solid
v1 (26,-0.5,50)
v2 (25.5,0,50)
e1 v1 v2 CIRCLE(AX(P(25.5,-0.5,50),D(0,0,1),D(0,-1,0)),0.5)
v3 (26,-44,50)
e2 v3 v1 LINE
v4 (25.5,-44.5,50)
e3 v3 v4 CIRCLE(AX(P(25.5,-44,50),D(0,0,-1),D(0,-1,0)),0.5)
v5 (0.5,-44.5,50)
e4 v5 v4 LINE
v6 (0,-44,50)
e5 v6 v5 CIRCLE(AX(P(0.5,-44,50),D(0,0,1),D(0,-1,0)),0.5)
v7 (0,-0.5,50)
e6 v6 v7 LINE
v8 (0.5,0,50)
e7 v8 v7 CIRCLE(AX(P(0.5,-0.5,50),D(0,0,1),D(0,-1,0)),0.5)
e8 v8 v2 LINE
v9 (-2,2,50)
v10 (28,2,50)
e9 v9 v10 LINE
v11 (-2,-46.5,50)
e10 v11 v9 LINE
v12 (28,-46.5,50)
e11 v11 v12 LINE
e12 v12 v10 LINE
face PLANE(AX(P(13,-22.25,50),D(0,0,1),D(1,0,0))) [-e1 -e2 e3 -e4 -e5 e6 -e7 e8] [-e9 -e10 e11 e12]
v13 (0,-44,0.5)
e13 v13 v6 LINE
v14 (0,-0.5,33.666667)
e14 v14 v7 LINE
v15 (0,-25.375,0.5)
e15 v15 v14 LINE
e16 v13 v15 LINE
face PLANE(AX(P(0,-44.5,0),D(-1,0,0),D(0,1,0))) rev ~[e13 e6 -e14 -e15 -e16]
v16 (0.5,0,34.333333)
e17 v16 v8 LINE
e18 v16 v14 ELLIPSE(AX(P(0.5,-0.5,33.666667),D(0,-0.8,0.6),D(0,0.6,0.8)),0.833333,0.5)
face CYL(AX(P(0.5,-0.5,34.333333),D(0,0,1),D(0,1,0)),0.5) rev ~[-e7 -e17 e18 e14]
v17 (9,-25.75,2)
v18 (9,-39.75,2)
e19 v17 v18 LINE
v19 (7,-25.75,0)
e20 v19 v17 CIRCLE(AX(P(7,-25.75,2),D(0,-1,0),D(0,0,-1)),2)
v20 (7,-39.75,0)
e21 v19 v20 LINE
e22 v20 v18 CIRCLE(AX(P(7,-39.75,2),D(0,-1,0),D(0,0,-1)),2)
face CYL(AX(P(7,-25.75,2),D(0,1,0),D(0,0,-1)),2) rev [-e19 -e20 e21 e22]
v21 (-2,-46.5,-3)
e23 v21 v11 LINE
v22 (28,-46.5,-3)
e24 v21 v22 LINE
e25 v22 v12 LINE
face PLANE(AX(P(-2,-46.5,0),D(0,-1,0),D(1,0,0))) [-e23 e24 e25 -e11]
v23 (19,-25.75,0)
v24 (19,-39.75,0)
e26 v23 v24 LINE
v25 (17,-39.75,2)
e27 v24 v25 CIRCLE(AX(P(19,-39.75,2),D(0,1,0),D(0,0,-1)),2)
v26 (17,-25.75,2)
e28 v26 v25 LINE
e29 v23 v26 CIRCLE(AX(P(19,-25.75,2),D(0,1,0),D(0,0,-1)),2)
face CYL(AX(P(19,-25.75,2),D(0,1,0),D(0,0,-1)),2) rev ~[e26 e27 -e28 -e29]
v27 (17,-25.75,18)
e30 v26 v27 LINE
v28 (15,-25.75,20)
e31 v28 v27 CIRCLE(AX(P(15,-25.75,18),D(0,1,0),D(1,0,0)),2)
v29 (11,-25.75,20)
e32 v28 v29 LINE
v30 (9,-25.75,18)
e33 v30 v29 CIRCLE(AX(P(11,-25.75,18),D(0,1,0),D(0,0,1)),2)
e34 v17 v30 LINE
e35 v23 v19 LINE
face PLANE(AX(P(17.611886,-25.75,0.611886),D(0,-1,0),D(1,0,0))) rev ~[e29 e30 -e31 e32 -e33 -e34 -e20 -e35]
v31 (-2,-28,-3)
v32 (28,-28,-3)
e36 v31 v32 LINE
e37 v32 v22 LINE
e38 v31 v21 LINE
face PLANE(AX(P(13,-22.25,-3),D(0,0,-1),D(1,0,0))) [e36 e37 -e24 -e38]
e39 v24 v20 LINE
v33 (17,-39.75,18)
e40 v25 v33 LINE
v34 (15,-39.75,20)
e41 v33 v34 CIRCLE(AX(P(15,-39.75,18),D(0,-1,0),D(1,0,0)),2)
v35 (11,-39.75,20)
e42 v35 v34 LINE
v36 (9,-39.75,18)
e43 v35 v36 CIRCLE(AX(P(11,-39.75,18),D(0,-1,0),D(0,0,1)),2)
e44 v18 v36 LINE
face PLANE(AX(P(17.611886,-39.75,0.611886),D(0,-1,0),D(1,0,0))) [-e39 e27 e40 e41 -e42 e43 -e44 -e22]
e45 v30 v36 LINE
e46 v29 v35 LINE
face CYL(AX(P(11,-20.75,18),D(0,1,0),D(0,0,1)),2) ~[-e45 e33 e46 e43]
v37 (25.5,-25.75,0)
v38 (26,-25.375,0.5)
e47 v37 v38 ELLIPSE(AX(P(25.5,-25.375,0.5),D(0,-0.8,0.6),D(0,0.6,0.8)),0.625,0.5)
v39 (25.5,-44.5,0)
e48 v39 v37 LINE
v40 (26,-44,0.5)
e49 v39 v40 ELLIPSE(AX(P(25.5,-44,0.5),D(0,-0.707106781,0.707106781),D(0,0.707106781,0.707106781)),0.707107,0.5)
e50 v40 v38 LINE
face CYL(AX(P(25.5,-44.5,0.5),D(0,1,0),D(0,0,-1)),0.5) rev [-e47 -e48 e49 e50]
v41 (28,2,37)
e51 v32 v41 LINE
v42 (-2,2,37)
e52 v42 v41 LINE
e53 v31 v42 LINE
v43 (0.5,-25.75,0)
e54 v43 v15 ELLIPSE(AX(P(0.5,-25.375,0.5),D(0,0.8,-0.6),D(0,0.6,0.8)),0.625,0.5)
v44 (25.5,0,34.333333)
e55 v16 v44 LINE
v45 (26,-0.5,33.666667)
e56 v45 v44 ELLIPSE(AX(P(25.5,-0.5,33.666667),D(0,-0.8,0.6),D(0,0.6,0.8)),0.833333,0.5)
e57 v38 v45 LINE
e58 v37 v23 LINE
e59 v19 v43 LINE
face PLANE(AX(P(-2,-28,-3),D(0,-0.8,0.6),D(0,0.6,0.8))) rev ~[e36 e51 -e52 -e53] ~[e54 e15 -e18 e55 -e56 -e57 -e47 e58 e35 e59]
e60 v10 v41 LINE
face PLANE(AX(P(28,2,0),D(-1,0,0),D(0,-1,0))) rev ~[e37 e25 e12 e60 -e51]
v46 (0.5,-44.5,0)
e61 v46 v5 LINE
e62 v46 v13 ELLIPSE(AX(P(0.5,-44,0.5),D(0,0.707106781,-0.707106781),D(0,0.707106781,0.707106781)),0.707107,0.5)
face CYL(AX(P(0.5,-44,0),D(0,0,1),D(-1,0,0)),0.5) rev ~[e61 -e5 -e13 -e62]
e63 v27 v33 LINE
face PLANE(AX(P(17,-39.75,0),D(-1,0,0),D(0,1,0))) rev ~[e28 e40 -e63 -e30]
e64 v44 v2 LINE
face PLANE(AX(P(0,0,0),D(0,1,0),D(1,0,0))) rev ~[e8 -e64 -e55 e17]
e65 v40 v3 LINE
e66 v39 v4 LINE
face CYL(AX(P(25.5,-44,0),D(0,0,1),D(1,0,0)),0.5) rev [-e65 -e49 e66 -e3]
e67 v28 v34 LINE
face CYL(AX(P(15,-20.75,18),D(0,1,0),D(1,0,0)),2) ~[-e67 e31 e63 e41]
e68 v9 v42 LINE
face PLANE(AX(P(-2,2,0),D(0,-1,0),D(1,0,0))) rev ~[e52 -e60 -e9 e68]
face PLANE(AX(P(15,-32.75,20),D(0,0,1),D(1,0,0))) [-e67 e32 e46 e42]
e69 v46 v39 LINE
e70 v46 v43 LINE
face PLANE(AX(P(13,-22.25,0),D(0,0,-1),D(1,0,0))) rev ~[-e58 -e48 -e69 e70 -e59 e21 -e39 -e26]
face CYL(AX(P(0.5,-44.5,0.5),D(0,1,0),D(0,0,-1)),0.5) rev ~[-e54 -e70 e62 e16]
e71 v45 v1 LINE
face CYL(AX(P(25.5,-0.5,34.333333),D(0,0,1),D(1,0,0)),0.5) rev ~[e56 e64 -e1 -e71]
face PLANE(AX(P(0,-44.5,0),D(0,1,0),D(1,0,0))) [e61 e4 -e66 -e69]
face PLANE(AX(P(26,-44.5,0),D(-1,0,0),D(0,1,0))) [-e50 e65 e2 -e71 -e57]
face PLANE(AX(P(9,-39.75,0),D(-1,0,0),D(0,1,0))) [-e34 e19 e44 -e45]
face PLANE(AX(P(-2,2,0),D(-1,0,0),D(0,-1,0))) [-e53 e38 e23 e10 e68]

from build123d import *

# Parameters (mm, degrees)
F0_W        = 30
F0_H        = 48.5
F0_W_2      = 26
F0_H_2      = 44.5
F1_DEPTH    = 50
F2_W        = 30
F2_H        = 48.5
F3_DEPTH    = 3
F5_DEPTH    = 30
F6_W        = 4
F6_H        = 14
F7_DEPTH    = 20
F8_R        = 0.5
F9_T1_DEPTH = 14
F9_T3_DEPTH = 19


# Not quite as in the source:
# - a fillet or chamfer that OpenCascade refuses, or shapes differently, is made with other operations: its cross-section is extruded or revolved along the edge and cut away or added


with BuildPart() as f1:
    # F0 (on Top) → F1 (new body)
    with BuildSketch(Plane.XY):
        with Locations((13, -22.25)):
            Rectangle(F0_W, F0_H)
        with Locations((13, -22.25)):
            Rectangle(F0_W_2, F0_H_2, mode=Mode.SUBTRACT)
    extrude(amount=F1_DEPTH)

    # F2 (on face) → F3 (join)
    with BuildSketch(Plane(origin=(0, 0, 0), x_dir=(1, 0, 0), z_dir=(0, 0, -1))):
        with Locations((13, 22.25)):
            Rectangle(F2_W, F2_H)
    extrude(amount=F3_DEPTH)

    # F4 (on face) → F5 (cut)
    with BuildSketch(Plane(origin=(-2, 0, 0), x_dir=(0, -1, 0), z_dir=(-1, 0, 0))):
        Polygon((-2, 37), (-2, -3), (28, -3), align=None)
    extrude(amount=-F5_DEPTH, mode=Mode.SUBTRACT)

    # F6 (on face) → F7 (join)
    with BuildSketch(Plane.XY):
        with Locations((15, -32.75)):
            Rectangle(F6_W, F6_H)
        with Locations((11, -32.75)):
            Rectangle(F6_W, F6_H)
    extrude(amount=F7_DEPTH)

    # F8
    f8_edges = [f1.edges().sort_by_distance(p)[0] for p in [
        (0, -35.125, 0),
        (26, -35.125, 0),
        (0, 0, 42.166667),
        (0, -44.5, 25),
        (26, -44.5, 25),
        (26, 0, 42.166667),
    ]]
    fillet(f8_edges, radius=F8_R)

    # F9: fillet of radius 2 on 4 edges, made by hand

    # F9_s2 → F9_t1 (join)
    with BuildSketch(Plane.XZ.offset(25.75)):
        with BuildLine():
            ThreePointArc((19, 0), (17.5857864376, 0.5857864376), (17, 2))
            Line((17, 2), (17, 0))
            Line((17, 0), (19, 0))
        make_face()
        with BuildLine():
            ThreePointArc((7, 0), (8.4142135624, 0.5857864376), (9, 2))
            Line((9, 2), (9, 0))
            Line((9, 0), (7, 0))
        make_face()
    extrude(amount=F9_T1_DEPTH)

    # F9_s4 → F9_t3 (cut)
    with BuildSketch(Plane.XZ.offset(20.75)):
        with BuildLine():
            ThreePointArc((17, 18), (16.4142135624, 19.4142135624), (15, 20))
            Line((15, 20), (17, 20))
            Line((17, 20), (17, 18))
        make_face()
        with BuildLine():
            ThreePointArc((11, 20), (9.5857864376, 19.4142135624), (9, 18))
            Line((9, 18), (9, 20))
            Line((9, 20), (11, 20))
        make_face()
    extrude(amount=F9_T3_DEPTH, mode=Mode.SUBTRACT)


solid = f1.part
